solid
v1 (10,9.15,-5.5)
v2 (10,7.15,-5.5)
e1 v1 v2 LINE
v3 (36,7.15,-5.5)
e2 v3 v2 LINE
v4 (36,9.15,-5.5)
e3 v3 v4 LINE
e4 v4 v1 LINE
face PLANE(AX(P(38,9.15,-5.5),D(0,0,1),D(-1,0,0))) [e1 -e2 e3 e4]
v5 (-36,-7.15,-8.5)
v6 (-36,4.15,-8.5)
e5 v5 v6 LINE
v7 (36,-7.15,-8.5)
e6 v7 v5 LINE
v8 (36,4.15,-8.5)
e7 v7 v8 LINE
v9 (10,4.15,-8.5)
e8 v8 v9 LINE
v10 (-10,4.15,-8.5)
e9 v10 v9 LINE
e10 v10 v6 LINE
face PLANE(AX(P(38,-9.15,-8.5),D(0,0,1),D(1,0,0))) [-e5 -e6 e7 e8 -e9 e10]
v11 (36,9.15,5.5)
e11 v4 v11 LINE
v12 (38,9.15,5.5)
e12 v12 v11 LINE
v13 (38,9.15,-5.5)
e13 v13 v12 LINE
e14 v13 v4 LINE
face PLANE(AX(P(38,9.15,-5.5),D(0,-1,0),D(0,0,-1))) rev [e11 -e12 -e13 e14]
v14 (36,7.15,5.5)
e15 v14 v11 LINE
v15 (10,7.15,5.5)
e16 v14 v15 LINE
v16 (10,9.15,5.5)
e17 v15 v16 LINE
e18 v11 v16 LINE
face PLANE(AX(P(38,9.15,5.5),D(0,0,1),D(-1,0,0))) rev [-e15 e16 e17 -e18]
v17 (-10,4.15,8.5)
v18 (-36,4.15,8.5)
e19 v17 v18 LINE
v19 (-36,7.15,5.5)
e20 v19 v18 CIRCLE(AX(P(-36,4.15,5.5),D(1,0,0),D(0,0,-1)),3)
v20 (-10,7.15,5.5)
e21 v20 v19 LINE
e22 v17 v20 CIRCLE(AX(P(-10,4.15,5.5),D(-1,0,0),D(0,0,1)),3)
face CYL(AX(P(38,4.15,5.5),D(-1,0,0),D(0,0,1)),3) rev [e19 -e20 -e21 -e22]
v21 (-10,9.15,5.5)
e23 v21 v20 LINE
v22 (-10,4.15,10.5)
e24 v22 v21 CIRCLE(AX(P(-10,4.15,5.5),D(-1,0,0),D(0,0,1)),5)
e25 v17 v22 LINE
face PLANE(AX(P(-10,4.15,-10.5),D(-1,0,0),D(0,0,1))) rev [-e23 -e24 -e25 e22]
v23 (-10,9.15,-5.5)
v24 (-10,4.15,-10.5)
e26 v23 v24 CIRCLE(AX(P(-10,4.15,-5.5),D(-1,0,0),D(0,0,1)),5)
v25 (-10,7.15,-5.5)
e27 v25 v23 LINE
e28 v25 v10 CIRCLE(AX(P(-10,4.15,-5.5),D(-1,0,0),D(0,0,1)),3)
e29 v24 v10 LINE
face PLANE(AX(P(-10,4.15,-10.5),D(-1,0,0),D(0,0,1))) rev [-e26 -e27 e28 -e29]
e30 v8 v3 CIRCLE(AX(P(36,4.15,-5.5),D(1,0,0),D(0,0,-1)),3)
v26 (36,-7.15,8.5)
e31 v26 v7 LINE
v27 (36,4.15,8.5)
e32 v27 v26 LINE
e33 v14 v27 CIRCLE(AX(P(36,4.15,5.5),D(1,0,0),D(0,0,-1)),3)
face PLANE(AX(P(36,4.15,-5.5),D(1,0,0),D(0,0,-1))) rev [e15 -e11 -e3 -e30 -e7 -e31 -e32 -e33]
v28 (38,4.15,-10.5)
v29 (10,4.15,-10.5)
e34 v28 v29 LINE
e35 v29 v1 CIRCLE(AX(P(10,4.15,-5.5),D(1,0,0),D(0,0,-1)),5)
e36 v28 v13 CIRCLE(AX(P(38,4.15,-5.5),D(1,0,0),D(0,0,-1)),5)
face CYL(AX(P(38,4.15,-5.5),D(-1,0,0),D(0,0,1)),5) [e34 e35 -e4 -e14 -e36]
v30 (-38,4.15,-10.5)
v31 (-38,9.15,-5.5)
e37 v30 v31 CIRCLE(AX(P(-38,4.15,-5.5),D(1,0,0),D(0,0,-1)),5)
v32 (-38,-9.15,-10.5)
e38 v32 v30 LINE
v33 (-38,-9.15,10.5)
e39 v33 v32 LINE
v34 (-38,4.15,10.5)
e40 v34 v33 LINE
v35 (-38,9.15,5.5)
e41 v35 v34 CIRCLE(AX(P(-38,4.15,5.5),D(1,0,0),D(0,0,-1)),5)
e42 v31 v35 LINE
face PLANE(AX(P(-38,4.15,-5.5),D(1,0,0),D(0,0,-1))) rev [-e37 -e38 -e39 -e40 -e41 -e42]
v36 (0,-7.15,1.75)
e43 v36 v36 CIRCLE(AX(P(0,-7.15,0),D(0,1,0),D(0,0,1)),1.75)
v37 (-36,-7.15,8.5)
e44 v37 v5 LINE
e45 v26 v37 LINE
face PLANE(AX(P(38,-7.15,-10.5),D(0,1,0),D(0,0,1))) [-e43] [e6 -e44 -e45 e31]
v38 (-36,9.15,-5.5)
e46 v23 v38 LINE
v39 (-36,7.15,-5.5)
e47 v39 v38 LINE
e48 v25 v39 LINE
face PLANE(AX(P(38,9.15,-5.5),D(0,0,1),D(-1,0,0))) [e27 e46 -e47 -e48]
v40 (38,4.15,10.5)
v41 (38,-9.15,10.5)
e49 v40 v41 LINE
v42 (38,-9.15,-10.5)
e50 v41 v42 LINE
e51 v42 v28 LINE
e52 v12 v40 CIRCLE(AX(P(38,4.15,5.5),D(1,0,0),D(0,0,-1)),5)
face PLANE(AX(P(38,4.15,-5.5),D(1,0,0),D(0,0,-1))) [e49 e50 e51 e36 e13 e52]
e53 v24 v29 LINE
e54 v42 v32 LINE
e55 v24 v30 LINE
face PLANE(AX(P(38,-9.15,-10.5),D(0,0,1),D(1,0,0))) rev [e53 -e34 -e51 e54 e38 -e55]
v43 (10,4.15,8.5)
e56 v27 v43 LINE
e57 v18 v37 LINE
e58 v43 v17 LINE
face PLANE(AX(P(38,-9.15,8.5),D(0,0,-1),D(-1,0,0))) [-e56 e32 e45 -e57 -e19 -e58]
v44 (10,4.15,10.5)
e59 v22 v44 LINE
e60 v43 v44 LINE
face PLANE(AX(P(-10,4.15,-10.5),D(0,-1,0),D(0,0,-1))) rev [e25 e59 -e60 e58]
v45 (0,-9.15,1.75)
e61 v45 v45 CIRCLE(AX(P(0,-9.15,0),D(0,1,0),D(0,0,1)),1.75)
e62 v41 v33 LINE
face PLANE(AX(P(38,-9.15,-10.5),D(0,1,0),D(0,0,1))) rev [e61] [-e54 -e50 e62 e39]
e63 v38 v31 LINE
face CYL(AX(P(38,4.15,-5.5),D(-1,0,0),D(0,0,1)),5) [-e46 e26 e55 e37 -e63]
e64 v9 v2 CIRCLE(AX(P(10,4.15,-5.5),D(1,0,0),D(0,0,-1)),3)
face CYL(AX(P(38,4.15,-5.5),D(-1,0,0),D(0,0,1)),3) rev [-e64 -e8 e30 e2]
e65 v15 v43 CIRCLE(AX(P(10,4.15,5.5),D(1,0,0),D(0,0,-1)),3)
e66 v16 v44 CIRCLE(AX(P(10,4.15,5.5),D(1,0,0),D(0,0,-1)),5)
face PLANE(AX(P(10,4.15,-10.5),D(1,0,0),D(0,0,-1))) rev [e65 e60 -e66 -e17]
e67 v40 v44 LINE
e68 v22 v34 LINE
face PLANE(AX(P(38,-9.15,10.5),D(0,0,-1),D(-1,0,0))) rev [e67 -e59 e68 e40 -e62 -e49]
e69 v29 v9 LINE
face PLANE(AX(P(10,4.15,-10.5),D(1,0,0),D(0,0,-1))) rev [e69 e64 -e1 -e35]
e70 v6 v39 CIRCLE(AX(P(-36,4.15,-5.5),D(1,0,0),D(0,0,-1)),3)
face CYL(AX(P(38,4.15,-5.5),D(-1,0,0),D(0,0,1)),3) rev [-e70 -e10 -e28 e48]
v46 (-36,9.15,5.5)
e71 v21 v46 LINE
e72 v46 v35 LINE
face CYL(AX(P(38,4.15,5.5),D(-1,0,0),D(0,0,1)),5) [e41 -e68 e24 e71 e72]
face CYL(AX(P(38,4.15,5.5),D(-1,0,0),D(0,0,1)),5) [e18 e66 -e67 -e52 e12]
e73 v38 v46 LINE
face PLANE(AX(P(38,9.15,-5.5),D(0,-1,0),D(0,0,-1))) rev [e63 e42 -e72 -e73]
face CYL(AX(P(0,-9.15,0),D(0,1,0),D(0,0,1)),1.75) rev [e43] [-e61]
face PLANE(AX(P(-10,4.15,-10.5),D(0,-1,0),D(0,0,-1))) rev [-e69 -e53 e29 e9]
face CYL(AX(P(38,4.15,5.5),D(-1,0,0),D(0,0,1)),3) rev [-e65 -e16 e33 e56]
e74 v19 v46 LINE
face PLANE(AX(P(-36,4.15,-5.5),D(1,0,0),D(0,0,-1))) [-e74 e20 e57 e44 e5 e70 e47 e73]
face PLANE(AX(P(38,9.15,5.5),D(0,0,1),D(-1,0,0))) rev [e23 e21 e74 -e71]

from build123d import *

# Parameters (mm, degrees)
BODY_DEPTH          = 38
SHELL1_START        = -36
SHELL1_DEPTH        = 72
HOLE_DEPTH          = 41.471872949
HOLE_DEPTH_BACK     = 41.471872949
SKETCH2_W           = 20
SKETCH2_H           = 5
SKETCH3_R           = 1.75
FIXATION_HOLE_DEPTH = 43.660754799


# Read off the part's stored shape, not the designer's step: Shell1
with BuildPart() as part:
    # Sketch1 → Body (new, symmetric)
    with BuildSketch(Plane(origin=(0, 0, 0), x_dir=(0, 0, -1), z_dir=(1, 0, 0))):
        with BuildLine():
            Line((10.5, -9.15), (-10.5, -9.15))
            Line((-10.5, -9.15), (-10.5, 4.15))
            ThreePointArc((-10.5, 4.15), (-9.035533906, 7.685533906), (-5.5, 9.15))
            Line((-5.5, 9.15), (5.5, 9.15))
            ThreePointArc((5.5, 9.15), (9.035533906, 7.685533906), (10.5, 4.15))
            Line((10.5, 4.15), (10.5, -9.15))
        make_face()
    extrude(amount=BODY_DEPTH, both=True)

    # Shell1 outline → Shell1 (cut)
    with BuildSketch(Plane.YZ.offset(SHELL1_START)):
        with BuildLine():
            Line((7.15, -5.5), (9.15, -5.5))
            Line((9.15, -5.5), (9.15, 5.5))
            Line((9.15, 5.5), (7.15, 5.5))
            ThreePointArc((7.15, 5.5), (6.271320344, 7.621320344), (4.15, 8.5))
            Line((4.15, 8.5), (-7.15, 8.5))
            Line((-7.15, 8.5), (-7.15, -8.5))
            Line((-7.15, -8.5), (4.15, -8.5))
            ThreePointArc((4.15, -8.5), (6.271320344, -7.621320344), (7.15, -5.5))
        make_face()
    extrude(amount=SHELL1_DEPTH, mode=Mode.SUBTRACT)

    # Sketch2 → Hole (cut, two sides: drawn at the far end of the back side and taken through both)
    with BuildSketch(Plane.XY.offset(-HOLE_DEPTH_BACK)):
        with Locations((0, 6.65)):
            Rectangle(SKETCH2_W, SKETCH2_H)
    extrude(amount=HOLE_DEPTH + HOLE_DEPTH_BACK, mode=Mode.SUBTRACT)

    # Sketch3 → Fixation_Hole (cut, through all)
    with BuildSketch(Plane(origin=(0, -7.15, 0), x_dir=(1, 0, 0), z_dir=(0, 1, 0))):
        with Locations(Location((0, 0, 0), (0, 0, 270))):
            Circle(SKETCH3_R)
    extrude(amount=-FIXATION_HOLE_DEPTH, mode=Mode.SUBTRACT)


solid = part.part
